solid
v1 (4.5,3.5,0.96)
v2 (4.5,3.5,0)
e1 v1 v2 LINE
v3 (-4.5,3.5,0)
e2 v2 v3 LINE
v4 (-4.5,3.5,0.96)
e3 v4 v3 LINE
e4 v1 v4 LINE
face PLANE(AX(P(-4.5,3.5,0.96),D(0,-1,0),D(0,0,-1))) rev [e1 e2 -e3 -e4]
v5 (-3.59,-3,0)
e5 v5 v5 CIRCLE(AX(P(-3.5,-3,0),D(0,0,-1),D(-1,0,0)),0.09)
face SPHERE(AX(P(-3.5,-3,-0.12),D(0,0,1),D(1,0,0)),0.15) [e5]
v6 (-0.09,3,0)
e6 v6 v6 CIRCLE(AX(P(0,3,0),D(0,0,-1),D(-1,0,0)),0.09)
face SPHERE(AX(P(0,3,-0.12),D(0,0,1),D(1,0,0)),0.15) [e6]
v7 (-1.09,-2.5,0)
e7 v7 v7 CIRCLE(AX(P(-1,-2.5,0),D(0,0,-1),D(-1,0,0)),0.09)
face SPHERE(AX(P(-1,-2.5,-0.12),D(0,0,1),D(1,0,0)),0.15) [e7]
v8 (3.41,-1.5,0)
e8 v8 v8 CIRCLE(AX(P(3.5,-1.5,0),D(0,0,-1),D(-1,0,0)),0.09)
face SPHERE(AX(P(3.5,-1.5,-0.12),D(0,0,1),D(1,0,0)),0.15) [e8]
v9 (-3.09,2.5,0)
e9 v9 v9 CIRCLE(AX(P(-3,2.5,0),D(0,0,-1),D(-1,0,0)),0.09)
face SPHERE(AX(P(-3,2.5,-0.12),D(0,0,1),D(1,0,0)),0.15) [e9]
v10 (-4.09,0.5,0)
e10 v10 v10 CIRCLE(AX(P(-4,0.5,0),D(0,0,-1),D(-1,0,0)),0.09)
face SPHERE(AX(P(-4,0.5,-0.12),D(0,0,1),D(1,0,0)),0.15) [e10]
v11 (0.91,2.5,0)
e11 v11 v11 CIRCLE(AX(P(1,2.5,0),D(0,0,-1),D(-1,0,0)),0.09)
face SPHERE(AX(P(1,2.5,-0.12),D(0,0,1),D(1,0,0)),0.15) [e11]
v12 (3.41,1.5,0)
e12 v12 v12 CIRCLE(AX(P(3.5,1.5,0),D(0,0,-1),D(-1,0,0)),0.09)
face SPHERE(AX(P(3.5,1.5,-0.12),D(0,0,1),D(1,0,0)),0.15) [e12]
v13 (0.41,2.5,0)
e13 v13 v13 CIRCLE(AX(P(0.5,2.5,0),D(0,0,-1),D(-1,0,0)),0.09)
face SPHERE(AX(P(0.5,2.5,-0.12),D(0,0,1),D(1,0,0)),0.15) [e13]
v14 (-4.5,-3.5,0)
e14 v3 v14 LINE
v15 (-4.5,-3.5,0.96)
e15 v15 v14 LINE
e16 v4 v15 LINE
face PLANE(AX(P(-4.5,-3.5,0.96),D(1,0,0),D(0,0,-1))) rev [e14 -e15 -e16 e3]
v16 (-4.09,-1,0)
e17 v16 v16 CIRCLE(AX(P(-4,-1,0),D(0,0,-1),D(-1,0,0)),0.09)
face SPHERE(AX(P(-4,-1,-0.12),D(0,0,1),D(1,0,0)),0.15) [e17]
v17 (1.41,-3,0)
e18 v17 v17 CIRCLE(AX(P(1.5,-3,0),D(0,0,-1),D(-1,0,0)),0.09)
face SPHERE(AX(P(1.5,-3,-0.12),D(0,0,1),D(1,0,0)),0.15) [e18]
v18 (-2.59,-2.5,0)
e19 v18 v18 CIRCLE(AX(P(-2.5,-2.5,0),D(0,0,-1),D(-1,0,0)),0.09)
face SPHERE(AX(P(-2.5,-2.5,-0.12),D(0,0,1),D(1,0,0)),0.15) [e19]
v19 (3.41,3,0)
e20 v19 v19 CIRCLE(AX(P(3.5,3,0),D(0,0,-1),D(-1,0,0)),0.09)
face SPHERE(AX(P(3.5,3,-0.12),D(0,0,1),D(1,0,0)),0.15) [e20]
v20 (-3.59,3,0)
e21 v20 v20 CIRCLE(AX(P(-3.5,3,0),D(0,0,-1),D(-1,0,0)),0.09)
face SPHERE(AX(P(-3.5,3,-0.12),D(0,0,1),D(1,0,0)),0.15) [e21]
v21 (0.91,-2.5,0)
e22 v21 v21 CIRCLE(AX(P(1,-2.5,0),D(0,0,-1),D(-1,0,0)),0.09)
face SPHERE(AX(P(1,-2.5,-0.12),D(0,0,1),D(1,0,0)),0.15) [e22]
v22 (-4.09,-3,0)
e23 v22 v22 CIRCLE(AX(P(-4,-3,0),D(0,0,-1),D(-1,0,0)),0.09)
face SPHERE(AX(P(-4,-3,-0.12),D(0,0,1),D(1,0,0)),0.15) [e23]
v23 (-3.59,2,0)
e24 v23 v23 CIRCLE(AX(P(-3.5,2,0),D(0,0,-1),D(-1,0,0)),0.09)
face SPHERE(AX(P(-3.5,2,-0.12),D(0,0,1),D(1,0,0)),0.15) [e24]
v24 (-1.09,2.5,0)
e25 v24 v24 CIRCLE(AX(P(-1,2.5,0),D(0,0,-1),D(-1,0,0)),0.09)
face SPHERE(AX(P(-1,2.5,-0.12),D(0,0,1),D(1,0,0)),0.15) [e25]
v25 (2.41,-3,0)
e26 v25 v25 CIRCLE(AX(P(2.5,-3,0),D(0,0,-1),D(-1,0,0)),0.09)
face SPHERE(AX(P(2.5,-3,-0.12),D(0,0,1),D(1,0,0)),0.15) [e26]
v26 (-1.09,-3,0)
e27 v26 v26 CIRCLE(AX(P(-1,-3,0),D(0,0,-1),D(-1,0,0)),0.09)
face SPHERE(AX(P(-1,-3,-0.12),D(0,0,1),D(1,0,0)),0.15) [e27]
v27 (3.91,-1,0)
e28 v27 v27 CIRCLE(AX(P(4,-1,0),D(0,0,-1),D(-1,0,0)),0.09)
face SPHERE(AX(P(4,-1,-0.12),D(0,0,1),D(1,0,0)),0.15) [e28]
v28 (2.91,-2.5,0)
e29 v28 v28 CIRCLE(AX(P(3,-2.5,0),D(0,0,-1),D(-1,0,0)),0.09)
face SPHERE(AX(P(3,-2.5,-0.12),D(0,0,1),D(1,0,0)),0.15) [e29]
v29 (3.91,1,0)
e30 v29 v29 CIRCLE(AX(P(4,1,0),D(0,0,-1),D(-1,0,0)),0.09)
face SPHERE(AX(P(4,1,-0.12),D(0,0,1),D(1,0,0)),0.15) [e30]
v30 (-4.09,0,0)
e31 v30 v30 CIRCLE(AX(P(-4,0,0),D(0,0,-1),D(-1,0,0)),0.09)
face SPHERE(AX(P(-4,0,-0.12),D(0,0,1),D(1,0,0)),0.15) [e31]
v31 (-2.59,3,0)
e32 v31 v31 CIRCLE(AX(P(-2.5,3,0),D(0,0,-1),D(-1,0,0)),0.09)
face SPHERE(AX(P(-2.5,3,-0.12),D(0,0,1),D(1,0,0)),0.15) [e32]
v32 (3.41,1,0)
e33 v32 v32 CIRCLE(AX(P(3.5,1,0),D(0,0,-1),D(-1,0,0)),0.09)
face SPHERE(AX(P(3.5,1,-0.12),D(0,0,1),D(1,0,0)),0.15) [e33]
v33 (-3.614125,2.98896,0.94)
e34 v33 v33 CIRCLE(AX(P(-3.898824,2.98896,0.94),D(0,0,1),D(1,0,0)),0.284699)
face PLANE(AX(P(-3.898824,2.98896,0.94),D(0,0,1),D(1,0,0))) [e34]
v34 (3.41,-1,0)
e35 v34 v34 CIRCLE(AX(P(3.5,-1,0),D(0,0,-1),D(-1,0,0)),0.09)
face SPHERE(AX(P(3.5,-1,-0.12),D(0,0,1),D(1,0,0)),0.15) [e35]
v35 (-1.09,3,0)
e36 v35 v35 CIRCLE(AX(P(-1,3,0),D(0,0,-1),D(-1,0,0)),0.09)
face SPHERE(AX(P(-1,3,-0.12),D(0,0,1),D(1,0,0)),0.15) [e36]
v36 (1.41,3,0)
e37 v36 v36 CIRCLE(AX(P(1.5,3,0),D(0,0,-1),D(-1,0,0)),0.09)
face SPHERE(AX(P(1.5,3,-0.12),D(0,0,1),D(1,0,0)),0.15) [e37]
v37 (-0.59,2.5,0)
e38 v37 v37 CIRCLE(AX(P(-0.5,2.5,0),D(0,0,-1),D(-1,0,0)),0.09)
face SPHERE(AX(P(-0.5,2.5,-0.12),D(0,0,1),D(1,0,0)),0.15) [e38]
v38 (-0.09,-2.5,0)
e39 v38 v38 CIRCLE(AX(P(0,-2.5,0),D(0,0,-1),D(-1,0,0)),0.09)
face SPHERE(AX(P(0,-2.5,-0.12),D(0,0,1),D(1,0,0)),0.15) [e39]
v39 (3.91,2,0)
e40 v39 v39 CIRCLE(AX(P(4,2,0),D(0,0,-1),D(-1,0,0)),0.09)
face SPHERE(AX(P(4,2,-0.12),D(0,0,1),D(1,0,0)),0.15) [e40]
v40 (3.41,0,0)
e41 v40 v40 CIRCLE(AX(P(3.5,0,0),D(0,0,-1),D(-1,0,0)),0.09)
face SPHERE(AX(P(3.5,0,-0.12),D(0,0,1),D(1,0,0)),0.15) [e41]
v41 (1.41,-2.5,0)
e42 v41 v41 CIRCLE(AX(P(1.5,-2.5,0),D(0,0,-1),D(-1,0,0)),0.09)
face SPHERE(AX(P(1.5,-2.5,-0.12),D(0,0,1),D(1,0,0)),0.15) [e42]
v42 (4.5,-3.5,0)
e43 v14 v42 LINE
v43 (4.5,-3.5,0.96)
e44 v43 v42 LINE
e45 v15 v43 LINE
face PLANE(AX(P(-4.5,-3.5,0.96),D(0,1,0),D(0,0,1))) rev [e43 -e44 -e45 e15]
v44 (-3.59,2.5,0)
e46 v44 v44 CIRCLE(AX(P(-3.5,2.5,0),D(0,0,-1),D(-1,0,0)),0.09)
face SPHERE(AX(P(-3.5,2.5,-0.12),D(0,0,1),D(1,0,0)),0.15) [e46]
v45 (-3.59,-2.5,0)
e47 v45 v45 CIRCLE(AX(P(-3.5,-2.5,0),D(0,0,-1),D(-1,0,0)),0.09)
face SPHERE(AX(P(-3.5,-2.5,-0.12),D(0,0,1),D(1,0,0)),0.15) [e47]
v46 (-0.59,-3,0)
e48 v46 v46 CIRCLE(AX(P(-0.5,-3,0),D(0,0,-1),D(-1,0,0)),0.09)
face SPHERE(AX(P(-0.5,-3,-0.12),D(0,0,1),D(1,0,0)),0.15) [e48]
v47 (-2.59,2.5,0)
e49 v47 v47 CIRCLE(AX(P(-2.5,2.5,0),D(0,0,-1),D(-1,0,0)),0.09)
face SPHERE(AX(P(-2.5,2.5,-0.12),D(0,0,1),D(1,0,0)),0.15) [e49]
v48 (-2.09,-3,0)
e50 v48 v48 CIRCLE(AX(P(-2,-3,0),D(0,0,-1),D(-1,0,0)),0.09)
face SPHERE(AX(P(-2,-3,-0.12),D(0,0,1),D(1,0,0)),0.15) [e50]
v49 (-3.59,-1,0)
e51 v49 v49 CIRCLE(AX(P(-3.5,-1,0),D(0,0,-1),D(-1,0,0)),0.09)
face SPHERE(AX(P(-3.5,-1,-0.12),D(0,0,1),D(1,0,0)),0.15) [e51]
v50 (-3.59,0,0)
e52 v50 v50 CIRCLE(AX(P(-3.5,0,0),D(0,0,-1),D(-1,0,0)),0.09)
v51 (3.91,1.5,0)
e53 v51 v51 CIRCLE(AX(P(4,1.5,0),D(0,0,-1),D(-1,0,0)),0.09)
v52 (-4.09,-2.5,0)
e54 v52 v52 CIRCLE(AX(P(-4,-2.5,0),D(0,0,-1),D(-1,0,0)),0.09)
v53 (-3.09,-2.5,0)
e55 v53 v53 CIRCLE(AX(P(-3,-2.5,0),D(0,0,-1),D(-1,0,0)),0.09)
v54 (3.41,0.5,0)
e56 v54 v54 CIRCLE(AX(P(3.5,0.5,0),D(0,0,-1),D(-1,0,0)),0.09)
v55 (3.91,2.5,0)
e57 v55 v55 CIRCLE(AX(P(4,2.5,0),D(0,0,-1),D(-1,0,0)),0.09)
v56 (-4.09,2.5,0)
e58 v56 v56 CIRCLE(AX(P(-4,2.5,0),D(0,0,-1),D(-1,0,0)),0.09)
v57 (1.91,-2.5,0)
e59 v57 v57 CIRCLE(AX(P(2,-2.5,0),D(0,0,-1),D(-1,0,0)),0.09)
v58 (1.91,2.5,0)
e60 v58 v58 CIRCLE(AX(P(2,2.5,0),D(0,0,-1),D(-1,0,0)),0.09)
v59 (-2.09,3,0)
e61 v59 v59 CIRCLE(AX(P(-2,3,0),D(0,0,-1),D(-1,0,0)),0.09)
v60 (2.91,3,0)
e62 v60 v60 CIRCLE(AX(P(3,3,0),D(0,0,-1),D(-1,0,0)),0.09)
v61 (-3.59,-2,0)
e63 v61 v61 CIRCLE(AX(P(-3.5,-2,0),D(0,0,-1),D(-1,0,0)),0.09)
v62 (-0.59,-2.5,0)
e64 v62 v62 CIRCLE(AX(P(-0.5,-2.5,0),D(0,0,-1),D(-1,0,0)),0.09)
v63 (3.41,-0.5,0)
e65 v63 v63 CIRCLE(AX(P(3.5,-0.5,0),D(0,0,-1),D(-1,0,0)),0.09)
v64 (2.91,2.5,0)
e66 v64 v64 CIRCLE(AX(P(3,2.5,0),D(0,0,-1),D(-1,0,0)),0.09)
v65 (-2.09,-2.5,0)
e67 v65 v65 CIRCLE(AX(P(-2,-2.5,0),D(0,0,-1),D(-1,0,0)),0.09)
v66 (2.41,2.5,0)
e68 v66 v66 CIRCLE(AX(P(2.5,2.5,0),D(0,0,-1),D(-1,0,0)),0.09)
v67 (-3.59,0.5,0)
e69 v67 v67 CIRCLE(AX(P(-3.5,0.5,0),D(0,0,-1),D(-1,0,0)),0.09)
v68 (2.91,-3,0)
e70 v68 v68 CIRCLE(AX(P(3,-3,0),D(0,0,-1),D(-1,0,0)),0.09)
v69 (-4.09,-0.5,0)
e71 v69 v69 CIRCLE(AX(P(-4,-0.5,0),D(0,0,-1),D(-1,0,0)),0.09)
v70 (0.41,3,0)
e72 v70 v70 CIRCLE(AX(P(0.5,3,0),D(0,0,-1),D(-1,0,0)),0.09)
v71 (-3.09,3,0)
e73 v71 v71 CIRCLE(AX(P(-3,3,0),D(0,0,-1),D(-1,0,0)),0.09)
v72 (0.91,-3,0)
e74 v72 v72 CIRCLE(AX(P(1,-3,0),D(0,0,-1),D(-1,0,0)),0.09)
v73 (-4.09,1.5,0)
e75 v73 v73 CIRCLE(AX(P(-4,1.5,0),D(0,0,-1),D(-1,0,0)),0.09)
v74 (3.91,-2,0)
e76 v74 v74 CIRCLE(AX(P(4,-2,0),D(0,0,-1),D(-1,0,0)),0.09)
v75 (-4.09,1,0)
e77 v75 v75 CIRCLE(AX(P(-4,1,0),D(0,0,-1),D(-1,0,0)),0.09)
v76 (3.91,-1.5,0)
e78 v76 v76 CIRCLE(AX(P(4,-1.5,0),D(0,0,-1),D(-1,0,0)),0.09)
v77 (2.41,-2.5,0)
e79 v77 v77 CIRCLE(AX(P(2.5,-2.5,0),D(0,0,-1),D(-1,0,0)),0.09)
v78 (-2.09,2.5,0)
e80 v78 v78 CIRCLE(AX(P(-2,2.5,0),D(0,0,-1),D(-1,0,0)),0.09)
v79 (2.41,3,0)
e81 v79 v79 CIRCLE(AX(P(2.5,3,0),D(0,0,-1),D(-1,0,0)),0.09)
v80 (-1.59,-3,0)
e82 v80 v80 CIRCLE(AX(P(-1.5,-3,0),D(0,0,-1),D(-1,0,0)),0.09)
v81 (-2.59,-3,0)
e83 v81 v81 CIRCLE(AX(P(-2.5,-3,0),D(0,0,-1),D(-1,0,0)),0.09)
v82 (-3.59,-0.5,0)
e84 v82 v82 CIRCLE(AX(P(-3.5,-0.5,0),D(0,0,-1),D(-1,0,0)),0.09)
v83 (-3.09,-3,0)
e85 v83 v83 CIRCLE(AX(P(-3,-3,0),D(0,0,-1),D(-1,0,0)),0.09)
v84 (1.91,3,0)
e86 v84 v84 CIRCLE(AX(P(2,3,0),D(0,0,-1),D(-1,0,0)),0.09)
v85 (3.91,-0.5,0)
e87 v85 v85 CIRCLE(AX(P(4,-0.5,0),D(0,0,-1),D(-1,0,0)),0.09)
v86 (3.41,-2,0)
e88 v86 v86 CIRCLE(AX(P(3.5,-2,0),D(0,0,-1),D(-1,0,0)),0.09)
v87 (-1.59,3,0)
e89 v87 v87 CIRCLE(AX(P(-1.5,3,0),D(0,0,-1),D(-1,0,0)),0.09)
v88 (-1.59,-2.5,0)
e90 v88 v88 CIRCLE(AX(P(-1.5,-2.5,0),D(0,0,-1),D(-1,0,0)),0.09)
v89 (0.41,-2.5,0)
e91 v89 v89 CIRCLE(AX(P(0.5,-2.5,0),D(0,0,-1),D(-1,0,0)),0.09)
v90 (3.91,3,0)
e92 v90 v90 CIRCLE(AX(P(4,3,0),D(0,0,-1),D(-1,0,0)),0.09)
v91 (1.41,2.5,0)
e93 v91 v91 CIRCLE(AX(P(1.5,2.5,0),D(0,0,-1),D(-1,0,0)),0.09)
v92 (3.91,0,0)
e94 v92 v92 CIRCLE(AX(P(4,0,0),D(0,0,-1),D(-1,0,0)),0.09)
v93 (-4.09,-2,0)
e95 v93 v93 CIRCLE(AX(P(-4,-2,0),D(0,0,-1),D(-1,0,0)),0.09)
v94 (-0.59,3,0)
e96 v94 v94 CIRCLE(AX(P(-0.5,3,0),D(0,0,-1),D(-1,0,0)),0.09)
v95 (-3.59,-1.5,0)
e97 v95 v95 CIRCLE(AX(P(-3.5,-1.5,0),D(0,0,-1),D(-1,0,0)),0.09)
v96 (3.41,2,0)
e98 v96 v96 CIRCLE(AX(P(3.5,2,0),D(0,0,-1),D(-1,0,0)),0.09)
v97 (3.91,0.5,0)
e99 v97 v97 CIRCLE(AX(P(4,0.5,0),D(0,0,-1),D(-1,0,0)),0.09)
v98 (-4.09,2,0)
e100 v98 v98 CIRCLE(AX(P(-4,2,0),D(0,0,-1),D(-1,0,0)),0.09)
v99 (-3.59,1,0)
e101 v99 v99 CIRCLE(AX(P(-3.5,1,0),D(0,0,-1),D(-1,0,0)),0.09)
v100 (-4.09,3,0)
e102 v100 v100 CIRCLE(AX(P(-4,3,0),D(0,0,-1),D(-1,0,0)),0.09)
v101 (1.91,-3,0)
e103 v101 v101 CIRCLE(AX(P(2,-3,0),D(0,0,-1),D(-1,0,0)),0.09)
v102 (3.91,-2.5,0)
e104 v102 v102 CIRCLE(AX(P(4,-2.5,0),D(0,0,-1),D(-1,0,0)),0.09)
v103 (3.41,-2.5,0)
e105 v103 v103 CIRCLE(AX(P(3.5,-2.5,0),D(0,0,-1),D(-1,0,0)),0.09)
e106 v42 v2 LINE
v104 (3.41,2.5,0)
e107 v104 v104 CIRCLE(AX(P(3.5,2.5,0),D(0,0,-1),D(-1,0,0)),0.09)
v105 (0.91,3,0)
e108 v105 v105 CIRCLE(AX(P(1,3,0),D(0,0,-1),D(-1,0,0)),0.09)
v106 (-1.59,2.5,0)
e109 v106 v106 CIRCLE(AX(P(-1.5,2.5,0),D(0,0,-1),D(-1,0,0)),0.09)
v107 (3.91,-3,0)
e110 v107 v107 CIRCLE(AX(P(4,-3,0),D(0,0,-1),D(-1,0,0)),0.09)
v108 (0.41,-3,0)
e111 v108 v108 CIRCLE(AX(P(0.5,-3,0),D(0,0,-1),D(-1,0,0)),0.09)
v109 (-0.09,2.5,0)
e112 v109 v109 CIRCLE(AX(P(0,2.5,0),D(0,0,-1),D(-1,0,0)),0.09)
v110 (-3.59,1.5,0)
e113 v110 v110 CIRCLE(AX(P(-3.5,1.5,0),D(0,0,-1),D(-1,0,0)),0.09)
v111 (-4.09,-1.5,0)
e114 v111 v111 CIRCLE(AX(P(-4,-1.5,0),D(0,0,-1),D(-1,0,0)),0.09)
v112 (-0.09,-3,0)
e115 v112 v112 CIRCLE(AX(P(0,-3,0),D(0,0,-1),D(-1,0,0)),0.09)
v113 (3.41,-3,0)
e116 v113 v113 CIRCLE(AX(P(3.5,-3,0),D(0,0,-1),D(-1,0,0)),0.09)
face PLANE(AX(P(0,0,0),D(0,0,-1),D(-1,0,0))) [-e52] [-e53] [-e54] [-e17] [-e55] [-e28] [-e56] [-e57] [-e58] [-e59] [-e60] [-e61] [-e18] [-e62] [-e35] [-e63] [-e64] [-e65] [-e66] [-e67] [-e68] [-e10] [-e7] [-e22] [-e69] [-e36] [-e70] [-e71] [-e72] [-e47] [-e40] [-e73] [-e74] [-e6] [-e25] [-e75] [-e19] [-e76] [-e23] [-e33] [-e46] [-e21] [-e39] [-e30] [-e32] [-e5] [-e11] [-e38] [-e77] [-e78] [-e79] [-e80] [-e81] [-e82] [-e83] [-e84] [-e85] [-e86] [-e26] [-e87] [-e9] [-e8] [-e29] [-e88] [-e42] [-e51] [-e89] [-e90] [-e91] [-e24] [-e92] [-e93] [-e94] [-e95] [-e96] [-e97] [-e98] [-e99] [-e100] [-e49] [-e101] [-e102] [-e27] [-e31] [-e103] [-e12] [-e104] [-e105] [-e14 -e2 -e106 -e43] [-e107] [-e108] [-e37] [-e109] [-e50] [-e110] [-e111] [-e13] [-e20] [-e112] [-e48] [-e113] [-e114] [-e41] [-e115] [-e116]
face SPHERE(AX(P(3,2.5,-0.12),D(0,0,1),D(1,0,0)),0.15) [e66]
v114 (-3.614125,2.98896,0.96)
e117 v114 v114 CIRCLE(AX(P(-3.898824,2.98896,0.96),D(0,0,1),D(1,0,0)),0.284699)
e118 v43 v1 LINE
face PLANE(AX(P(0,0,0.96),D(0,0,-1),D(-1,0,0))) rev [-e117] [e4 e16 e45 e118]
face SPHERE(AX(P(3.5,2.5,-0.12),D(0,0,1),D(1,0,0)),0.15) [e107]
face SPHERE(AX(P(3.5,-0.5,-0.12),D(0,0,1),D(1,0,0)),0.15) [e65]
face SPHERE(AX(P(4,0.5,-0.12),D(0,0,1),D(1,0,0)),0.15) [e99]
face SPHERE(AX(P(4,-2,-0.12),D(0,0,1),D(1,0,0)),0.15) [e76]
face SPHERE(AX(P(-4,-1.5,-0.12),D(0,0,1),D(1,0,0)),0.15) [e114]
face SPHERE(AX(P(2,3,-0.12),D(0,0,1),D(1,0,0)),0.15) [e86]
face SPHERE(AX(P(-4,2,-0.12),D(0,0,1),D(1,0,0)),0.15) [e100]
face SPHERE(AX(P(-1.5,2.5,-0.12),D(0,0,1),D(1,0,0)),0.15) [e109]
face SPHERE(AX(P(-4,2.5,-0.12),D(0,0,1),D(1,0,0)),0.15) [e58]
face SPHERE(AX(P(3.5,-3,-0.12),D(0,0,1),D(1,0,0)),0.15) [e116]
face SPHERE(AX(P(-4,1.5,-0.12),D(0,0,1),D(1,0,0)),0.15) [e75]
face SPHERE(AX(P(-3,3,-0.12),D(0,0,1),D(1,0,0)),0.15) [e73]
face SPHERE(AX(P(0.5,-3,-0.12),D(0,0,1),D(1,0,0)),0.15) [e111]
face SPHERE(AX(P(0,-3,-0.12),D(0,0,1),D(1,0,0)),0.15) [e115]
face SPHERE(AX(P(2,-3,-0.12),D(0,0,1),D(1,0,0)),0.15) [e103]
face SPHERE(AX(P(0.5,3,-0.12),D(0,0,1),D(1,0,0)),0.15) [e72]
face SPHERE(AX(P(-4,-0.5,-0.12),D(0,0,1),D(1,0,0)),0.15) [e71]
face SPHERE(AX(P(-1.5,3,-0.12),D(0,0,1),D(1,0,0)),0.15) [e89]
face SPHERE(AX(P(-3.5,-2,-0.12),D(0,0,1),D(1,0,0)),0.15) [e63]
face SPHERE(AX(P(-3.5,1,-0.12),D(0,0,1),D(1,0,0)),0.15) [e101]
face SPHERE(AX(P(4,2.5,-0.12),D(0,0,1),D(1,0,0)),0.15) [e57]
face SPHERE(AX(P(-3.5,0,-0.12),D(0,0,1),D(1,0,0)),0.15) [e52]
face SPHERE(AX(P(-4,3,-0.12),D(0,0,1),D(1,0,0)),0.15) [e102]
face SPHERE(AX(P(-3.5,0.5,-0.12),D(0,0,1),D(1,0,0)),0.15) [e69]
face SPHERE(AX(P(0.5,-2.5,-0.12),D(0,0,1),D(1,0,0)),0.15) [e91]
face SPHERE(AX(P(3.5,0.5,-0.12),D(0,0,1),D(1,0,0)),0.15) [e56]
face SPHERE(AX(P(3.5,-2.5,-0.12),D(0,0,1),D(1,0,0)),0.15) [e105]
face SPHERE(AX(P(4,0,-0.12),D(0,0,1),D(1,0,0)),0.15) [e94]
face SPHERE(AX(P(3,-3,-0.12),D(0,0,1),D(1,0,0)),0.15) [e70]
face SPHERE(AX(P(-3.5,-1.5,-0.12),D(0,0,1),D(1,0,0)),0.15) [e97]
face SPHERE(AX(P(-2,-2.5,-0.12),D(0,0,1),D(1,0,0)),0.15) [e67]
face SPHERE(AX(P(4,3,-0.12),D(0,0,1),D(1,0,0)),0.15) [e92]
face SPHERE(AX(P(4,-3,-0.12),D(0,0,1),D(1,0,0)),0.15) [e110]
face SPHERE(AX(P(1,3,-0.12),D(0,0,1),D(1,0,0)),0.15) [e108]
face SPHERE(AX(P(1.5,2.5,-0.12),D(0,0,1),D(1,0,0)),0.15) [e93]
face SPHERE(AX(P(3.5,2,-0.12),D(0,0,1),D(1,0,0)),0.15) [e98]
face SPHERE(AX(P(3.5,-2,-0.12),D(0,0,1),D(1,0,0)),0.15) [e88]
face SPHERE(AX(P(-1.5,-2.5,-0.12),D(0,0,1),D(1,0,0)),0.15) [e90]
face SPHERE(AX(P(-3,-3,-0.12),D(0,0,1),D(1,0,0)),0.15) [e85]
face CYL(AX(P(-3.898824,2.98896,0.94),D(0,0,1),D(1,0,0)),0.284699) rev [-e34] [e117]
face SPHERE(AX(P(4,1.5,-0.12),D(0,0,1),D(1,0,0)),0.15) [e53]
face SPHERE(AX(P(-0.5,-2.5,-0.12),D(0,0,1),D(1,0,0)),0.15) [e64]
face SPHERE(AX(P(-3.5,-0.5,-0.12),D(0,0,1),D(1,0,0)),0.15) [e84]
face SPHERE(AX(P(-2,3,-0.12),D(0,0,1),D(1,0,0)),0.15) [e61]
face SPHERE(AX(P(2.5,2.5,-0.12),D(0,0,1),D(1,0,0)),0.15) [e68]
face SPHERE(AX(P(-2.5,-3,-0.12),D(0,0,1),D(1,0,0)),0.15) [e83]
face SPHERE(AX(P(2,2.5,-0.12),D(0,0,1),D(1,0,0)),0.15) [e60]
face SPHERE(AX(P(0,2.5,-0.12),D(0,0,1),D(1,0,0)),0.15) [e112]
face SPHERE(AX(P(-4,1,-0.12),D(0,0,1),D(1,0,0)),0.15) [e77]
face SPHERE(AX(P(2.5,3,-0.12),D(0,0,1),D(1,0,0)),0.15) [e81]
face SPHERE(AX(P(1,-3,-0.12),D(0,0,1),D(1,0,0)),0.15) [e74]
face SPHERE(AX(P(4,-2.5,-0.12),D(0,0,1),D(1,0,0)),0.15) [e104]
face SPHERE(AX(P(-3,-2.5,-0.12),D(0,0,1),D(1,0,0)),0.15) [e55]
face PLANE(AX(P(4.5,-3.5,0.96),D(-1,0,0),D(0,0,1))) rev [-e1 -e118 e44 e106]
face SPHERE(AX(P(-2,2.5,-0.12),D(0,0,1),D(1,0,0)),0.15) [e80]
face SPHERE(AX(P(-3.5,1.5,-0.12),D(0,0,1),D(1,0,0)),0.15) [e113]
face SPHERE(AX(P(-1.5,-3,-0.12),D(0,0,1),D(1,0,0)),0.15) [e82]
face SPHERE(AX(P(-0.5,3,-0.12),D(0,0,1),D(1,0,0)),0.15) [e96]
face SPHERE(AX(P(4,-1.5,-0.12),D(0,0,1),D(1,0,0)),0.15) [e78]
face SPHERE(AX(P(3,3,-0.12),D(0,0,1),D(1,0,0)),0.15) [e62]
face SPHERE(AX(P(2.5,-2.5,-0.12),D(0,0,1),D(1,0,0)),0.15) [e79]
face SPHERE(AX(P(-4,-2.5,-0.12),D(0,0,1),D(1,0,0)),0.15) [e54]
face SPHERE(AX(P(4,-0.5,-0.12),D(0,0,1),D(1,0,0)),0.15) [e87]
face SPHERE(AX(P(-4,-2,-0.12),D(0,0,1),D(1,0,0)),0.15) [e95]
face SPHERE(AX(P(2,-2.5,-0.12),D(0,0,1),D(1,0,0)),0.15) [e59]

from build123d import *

# Parameters (mm, degrees)
SKETCH1_W            = 9
SKETCH1_H            = 7
BOSS_EXTRUDE1_DEPTH  = 0.96
LPATTERN1_COUNT      = 17
LPATTERN1_PITCH      = 0.5
LPATTERN1_COUNT_DIR2 = 13
LPATTERN1_PITCH_DIR2 = 0.5
SKETCH4_R            = 0.284698622
CUT_EXTRUDE1_DEPTH   = 0.02


with BuildPart() as part:
    # Sketch1 → Boss-Extrude1 (new body)
    with BuildSketch(Plane.XY):
        Rectangle(SKETCH1_W, SKETCH1_H)
    extrude(amount=BOSS_EXTRUDE1_DEPTH)

    # Sketch3 → Revolve1 (revolve)
    with BuildSketch(Plane(origin=(0, 3, 0), x_dir=(1, 0, 0), z_dir=(0, 1, 0))):
        with BuildLine():
            Line((4, 0), (4.09, 0))
            ThreePointArc((4.09, 0), (4.142302495, 0.167434165), (4, 0.27))
            Line((4, 0.27), (4, 0))
        make_face()
    revolve1 = revolve(axis=Axis((4, 3, 0), (0, 0, -1)))

    # LPattern1: Revolve1 17 × 13, 117 skipped
    with Locations(*[(-i * LPATTERN1_PITCH, -j * LPATTERN1_PITCH_DIR2, 0) for i in range(LPATTERN1_COUNT) for j in range(LPATTERN1_COUNT_DIR2) if (i, j) not in ((0, 0), (2, 2), (2, 3), (2, 4), (2, 5), (2, 6), (2, 7), (2, 8), (2, 9), (2, 10), (3, 2), (3, 3), (3, 4), (3, 5), (3, 6), (3, 7), (3, 8), (3, 9), (3, 10), (4, 2), (4, 3), (4, 4), (4, 5), (4, 6), (4, 7), (4, 8), (4, 9), (4, 10), (5, 2), (5, 3), (5, 4), (5, 5), (5, 6), (5, 7), (5, 8), (5, 9), (5, 10), (6, 2), (6, 3), (6, 4), (6, 5), (6, 6), (6, 7), (6, 8), (6, 9), (6, 10), (7, 2), (7, 3), (7, 4), (7, 5), (7, 6), (7, 7), (7, 8), (7, 9), (7, 10), (8, 2), (8, 3), (8, 4), (8, 5), (8, 6), (8, 7), (8, 8), (8, 9), (8, 10), (9, 2), (9, 3), (9, 4), (9, 5), (9, 6), (9, 7), (9, 8), (9, 9), (9, 10), (10, 2), (10, 3), (10, 4), (10, 5), (10, 6), (10, 7), (10, 8), (10, 9), (10, 10), (11, 2), (11, 3), (11, 4), (11, 5), (11, 6), (11, 7), (11, 8), (11, 9), (11, 10), (12, 2), (12, 3), (12, 4), (12, 5), (12, 6), (12, 7), (12, 8), (12, 9), (12, 10), (13, 2), (13, 3), (13, 4), (13, 5), (13, 6), (13, 7), (13, 8), (13, 9), (13, 10), (14, 2), (14, 3), (14, 4), (14, 5), (14, 6), (14, 7), (14, 8), (14, 9), (14, 10))]):
        add(revolve1)

    # Sketch4 → Cut-Extrude1 (cut)
    with BuildSketch(Plane.XY.offset(0.96)):
        with Locations((-3.898823508, 2.988959518)):
            Circle(SKETCH4_R)
    extrude(amount=-CUT_EXTRUDE1_DEPTH, mode=Mode.SUBTRACT)


solid = part.part
